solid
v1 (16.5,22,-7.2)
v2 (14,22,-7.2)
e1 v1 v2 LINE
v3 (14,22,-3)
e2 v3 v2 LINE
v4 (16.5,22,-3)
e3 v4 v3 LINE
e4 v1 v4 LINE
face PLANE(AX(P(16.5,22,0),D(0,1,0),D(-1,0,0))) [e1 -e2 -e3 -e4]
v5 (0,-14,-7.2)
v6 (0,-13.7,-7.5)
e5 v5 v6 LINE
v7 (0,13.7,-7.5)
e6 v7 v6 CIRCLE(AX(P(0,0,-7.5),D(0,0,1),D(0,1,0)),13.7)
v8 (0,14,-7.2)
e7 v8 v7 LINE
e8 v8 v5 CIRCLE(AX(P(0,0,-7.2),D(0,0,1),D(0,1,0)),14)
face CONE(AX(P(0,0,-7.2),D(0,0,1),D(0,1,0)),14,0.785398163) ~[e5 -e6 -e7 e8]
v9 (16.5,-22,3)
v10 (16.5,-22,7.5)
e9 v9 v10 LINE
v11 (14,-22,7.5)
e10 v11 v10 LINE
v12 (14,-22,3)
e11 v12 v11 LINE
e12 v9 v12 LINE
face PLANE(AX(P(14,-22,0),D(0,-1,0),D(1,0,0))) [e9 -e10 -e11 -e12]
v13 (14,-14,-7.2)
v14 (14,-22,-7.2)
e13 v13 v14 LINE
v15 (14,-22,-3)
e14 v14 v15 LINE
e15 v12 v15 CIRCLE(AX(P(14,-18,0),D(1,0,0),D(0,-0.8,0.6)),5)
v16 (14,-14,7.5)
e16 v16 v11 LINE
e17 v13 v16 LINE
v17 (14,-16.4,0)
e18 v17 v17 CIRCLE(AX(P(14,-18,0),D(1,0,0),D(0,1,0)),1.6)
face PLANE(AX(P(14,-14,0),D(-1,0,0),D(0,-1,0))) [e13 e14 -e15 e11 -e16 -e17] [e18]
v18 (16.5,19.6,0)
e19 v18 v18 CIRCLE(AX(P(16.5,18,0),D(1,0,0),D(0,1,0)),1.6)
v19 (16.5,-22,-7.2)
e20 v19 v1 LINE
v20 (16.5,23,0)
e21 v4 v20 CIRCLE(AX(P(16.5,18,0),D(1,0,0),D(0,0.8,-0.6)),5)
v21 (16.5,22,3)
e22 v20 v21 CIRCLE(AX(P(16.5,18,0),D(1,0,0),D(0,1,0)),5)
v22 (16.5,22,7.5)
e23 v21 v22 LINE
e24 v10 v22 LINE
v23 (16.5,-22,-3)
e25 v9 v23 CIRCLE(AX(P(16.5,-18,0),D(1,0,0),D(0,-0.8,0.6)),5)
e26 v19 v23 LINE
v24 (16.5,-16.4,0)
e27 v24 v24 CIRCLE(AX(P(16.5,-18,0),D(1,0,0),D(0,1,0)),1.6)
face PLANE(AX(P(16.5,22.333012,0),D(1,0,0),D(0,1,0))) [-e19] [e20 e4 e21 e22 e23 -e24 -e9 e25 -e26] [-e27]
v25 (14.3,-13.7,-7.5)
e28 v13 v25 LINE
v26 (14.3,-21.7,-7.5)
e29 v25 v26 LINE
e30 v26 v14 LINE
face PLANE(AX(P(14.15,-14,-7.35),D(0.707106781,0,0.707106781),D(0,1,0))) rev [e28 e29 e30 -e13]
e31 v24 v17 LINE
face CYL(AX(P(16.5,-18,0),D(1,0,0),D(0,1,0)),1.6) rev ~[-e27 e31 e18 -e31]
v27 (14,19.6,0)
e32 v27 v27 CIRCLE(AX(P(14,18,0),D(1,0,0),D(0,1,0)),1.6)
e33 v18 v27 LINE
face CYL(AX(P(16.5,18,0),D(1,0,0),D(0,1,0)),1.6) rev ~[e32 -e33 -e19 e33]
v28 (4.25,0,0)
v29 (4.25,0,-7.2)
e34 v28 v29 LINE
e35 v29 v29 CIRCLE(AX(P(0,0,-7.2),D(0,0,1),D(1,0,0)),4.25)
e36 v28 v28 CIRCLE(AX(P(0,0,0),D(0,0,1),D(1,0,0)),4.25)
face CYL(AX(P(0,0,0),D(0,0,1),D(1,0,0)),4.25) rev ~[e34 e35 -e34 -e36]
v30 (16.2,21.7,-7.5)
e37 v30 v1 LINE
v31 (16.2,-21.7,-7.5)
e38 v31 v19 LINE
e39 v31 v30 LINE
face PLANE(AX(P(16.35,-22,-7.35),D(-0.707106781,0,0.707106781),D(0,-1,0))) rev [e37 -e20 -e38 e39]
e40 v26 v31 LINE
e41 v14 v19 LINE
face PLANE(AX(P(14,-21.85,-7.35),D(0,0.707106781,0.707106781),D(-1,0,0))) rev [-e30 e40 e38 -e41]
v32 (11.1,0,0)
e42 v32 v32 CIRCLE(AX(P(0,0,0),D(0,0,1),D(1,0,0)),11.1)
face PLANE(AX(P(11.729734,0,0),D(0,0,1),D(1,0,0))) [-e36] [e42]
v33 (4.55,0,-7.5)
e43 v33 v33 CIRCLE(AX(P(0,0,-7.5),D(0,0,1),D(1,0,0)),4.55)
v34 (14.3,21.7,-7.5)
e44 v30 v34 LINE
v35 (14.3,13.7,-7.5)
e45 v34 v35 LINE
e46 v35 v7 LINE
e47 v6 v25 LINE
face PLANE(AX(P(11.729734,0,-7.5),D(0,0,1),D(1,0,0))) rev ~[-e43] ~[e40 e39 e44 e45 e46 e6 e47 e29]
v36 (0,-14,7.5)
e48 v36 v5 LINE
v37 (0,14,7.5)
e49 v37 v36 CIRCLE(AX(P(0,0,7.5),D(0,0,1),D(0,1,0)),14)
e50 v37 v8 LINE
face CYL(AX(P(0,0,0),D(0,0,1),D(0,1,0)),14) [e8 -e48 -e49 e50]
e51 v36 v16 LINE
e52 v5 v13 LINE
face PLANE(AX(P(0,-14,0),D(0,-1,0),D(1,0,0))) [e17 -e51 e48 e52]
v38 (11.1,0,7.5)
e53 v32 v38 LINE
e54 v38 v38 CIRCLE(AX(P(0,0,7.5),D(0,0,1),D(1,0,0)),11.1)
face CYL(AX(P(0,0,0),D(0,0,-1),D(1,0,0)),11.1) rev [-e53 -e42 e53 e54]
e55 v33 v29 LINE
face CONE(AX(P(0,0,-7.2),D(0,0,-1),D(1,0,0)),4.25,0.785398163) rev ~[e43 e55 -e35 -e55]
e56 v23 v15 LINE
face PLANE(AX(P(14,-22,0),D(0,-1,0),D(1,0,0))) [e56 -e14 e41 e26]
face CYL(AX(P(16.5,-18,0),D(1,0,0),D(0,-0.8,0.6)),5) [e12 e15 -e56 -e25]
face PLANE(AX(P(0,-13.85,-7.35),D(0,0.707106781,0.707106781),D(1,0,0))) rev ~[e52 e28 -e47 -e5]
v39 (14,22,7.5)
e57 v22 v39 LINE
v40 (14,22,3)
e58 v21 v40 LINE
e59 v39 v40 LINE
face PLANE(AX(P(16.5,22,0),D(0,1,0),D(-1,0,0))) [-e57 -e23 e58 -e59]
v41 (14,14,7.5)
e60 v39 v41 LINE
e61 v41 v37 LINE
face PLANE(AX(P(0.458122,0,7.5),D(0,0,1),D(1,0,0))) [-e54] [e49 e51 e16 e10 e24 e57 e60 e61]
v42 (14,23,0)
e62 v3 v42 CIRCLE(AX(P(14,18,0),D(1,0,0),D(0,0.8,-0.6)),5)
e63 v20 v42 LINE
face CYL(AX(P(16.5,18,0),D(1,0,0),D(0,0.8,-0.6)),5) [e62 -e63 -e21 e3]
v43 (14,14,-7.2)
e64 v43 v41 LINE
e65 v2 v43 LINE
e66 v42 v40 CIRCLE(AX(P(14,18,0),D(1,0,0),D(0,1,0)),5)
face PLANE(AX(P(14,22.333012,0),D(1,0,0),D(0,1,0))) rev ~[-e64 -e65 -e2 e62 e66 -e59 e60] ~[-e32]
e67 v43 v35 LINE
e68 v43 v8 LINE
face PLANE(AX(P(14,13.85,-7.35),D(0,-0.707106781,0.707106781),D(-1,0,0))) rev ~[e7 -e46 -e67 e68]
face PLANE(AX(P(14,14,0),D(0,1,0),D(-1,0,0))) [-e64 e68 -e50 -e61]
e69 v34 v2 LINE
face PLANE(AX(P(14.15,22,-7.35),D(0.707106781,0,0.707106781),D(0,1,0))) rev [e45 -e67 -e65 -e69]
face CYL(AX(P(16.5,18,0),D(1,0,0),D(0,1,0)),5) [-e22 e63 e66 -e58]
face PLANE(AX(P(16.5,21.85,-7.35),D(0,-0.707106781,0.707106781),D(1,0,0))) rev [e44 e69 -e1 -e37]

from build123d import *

# Parameters (mm, degrees)
F0_R     = 11.1
F1_DEPTH = 7.5
F0_R_2   = 4.25
F2_DEPTH = 7.5
F3_R     = 1.6
F4_DEPTH = 30.501
F5_SIZE  = 0.3
F6_DEPTH = 2.5


with BuildPart() as f1:
    # F0 (on Top) → F1 (new body)
    with BuildSketch(Plane.XY):
        with BuildLine():
            ThreePointArc((0, -14), (9.8994949366, -9.8994949366), (14, 0))
            ThreePointArc((14, 0), (9.8994949366, 9.8994949366), (0, 14))
            ThreePointArc((0, 14), (-14, 0), (0, -14))
        make_face()
        Circle(F0_R, mode=Mode.SUBTRACT)
        with BuildLine():
            ThreePointArc((0, 14), (9.8994949366, 9.8994949366), (14, 0))
            ThreePointArc((14, 0), (9.8994949366, -9.8994949366), (0, -14))
            Line((0, -14), (14, -14))
            Line((14, -14), (14, -22))
            Line((14, -22), (16.5, -22))
            Line((16.5, -22), (16.5, 0))
            Line((16.5, 0), (16.5, 22))
            Line((16.5, 22), (14, 22))
            Line((14, 22), (14, 14))
            Line((14, 14), (0, 14))
        make_face()
    extrude(amount=F1_DEPTH)

    # F0 (on Top) → F2 (join)
    with BuildSketch(Plane.XY):
        with BuildLine():
            ThreePointArc((0, 14), (9.8994949366, 9.8994949366), (14, 0))
            ThreePointArc((14, 0), (9.8994949366, -9.8994949366), (0, -14))
            Line((0, -14), (14, -14))
            Line((14, -14), (14, -22))
            Line((14, -22), (16.5, -22))
            Line((16.5, -22), (16.5, 0))
            Line((16.5, 0), (16.5, 22))
            Line((16.5, 22), (14, 22))
            Line((14, 22), (14, 14))
            Line((14, 14), (0, 14))
        make_face()
        with BuildLine():
            ThreePointArc((0, -14), (9.8994949366, -9.8994949366), (14, 0))
            ThreePointArc((14, 0), (9.8994949366, 9.8994949366), (0, 14))
            ThreePointArc((0, 14), (-14, 0), (0, -14))
        make_face()
        Circle(F0_R, mode=Mode.SUBTRACT)
        Circle(F0_R)
        Circle(F0_R_2, mode=Mode.SUBTRACT)
    extrude(amount=-F2_DEPTH)

    # F3 (on face) → F4 (cut, through all)
    with BuildSketch(Plane.YZ.offset(16.5)):
        with Locations((18, 0)):
            Circle(F3_R)
        with Locations((-18, 0)):
            Circle(F3_R)
    extrude(amount=-F4_DEPTH, mode=Mode.SUBTRACT)

    # F5
    f5_edges = [f1.edges().sort_by_distance(p)[0] for p in [
        (7, -14, -7.5),
        (14, -18, -7.5),
        (15.25, -22, -7.5),
        (16.5, 0, -7.5),
        (15.25, 22, -7.5),
        (14, 18, -7.5),
        (7, 14, -7.5),
        (-14, 0, -7.5),
        (-4.25, 0, -7.5),
    ]]
    chamfer(f5_edges, length=F5_SIZE)

    # F3 (on face) → F6 (join, through all)
    with BuildSketch(Plane.YZ.offset(16.5)):
        with BuildLine():
            ThreePointArc((22, -3), (22.7434164903, -1.5811388301), (23, 0))
            ThreePointArc((23, 0), (22.7434164903, 1.5811388301), (22, 3))
            Line((22, 3), (22, -3))
        make_face()
        with BuildLine():
            Line((22, -3), (22, 3))
            ThreePointArc((22, 3), (13, 0), (22, -3))
        make_face()
        with Locations((18, 0)):
            Circle(F3_R, mode=Mode.SUBTRACT)
        with BuildLine():
            Line((-22, -3), (-22, 3))
            ThreePointArc((-22, 3), (-23, 0), (-22, -3))
        make_face()
    extrude(amount=-F6_DEPTH)


solid = f1.part
